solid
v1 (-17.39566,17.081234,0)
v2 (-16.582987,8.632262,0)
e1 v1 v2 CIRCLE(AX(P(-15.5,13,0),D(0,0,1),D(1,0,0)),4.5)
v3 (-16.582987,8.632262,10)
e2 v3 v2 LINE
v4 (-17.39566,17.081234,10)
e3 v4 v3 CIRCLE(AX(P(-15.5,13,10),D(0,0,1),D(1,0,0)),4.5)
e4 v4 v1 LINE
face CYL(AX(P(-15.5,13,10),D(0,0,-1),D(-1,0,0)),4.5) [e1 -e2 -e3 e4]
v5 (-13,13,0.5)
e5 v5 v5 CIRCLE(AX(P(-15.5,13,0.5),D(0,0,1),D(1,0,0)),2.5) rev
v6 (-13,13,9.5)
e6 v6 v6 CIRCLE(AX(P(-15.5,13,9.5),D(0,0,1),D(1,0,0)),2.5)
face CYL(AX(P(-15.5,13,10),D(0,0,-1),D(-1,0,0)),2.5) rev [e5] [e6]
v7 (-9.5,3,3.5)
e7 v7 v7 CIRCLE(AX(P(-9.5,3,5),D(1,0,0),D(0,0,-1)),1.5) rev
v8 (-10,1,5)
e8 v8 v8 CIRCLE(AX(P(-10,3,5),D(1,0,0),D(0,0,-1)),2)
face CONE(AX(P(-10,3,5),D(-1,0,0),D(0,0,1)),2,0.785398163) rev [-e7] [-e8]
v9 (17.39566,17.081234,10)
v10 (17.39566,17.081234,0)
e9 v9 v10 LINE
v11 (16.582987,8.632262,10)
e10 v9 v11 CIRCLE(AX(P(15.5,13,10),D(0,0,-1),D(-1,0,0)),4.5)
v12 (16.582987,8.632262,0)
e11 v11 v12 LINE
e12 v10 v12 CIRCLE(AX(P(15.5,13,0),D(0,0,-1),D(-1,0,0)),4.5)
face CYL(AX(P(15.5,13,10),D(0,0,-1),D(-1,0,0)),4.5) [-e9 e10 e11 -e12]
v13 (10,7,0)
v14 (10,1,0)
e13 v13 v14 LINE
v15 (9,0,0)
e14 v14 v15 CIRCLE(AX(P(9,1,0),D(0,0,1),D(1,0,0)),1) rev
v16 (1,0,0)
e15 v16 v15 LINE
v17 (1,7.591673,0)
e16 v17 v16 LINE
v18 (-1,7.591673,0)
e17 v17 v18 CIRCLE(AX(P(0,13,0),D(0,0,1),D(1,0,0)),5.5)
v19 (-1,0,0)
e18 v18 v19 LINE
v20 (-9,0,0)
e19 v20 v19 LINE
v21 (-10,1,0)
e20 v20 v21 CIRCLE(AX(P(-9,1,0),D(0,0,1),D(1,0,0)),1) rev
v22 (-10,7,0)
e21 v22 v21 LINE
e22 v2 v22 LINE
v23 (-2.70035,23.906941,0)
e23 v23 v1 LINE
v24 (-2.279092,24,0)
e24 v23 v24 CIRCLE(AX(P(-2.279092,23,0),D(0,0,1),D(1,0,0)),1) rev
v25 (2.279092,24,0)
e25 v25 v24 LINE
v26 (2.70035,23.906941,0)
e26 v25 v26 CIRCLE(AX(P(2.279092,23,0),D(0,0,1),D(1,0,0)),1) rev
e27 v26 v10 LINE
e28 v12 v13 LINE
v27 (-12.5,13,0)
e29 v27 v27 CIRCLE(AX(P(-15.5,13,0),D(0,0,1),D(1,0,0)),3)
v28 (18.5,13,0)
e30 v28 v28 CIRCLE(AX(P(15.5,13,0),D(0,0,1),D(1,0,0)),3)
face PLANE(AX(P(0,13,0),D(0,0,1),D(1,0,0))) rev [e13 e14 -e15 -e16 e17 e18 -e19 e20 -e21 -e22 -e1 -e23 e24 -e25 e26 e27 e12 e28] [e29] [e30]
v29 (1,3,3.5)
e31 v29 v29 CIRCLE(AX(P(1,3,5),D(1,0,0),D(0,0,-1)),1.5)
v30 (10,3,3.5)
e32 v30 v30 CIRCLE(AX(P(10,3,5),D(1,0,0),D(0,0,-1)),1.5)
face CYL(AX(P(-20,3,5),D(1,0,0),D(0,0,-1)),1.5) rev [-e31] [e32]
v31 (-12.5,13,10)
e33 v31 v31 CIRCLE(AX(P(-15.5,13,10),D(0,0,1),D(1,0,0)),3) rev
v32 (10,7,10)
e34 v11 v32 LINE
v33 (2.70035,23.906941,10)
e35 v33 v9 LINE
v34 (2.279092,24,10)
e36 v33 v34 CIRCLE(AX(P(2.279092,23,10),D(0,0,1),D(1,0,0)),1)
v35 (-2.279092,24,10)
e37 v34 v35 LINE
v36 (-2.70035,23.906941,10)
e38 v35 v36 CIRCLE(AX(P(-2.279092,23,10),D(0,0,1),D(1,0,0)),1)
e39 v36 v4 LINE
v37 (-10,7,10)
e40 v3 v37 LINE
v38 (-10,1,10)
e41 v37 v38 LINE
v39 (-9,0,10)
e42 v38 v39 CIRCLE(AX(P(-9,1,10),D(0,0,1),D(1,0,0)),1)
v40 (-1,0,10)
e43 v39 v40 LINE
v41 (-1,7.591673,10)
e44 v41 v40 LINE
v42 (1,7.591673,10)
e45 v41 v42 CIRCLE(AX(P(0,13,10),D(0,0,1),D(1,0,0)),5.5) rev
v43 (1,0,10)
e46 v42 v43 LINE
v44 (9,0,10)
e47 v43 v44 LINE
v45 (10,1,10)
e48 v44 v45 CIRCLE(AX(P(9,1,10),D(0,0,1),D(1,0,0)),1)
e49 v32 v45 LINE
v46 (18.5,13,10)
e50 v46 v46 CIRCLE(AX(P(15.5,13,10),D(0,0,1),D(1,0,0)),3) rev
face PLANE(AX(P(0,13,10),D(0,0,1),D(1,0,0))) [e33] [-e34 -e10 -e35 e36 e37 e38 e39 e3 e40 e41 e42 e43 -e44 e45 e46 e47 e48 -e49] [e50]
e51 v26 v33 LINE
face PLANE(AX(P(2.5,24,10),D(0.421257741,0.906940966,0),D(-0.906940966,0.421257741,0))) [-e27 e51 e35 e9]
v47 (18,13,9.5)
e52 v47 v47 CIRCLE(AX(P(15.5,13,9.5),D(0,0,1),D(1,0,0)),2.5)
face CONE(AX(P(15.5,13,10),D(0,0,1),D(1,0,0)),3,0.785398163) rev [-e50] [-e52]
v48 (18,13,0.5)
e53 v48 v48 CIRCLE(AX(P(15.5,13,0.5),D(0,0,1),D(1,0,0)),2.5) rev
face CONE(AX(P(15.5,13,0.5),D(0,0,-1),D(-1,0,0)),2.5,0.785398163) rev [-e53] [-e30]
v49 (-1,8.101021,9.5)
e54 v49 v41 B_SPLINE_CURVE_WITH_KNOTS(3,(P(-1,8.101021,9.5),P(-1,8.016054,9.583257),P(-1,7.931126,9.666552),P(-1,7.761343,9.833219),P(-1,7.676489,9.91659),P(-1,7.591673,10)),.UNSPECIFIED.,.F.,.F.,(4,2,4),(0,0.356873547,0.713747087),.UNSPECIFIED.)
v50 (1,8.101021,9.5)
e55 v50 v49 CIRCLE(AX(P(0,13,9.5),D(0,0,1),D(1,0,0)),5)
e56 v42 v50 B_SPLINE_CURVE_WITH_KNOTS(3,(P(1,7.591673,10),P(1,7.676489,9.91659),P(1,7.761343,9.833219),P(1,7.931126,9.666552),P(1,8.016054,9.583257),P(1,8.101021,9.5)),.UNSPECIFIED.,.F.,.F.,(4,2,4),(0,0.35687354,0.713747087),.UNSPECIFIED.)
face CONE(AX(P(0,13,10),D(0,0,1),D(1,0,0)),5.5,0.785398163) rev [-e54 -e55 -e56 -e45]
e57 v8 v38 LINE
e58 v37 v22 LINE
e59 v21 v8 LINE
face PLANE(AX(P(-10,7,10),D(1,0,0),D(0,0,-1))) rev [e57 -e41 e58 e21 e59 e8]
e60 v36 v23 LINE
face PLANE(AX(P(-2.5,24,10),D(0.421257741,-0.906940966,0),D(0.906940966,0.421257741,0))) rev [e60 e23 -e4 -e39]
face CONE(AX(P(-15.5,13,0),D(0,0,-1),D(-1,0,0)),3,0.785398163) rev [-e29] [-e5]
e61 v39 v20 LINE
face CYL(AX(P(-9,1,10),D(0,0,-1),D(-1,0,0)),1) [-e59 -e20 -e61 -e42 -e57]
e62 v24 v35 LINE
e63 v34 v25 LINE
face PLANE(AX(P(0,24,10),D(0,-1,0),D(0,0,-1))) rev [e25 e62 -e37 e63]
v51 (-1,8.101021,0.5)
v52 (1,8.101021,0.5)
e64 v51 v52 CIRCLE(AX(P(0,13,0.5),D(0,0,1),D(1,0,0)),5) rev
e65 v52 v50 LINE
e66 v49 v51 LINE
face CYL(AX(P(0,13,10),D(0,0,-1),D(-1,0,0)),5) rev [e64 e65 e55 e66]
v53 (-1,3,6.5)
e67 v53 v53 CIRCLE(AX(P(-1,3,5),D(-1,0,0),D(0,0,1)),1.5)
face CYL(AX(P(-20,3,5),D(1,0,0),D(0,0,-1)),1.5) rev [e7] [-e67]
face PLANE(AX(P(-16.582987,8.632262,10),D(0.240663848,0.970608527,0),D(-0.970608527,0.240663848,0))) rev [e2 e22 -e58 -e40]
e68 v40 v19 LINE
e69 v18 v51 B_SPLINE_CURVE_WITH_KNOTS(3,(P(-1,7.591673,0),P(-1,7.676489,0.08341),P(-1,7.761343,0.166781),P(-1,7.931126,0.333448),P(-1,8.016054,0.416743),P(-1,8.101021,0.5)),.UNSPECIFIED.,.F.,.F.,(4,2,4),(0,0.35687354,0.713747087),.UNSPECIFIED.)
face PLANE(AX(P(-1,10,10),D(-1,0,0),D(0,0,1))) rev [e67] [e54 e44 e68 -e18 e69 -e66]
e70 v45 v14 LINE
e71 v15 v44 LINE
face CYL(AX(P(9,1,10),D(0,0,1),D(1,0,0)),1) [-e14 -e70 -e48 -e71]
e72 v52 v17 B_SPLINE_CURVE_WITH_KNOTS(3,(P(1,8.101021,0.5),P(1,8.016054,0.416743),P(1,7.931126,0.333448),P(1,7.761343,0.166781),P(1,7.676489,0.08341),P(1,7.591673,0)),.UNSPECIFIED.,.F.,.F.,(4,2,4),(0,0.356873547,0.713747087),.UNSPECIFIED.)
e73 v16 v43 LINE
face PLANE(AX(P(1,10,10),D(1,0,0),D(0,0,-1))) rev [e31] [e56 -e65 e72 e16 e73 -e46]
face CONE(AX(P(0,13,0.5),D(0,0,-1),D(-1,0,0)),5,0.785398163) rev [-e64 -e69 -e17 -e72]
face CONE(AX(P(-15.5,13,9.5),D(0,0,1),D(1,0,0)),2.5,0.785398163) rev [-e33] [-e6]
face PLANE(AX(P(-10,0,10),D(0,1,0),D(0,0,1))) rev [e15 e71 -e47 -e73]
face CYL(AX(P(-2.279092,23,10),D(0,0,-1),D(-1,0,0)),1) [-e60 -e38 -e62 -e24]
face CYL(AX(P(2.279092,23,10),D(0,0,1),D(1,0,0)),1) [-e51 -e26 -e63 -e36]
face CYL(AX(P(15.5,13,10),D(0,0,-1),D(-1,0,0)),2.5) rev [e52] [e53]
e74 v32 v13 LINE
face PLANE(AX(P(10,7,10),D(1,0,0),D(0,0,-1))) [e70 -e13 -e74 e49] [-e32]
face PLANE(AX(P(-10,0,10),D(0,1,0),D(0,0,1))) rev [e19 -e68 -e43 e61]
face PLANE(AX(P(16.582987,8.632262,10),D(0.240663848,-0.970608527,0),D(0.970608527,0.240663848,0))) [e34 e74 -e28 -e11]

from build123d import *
from build123d.topology import SkipClean

# Parameters (mm, degrees)
SKETCH_1_R          = 2.5
EXTRUDE_1_DEPTH     = 10
SKETCH_2_W          = 2
SKETCH_2_H          = 10
CUT_EXTRUDE_1_DEPTH = 10
SKETCH_3_R          = 1.5
CUT_EXTRUDE_2_DEPTH = 40.698866483
CHAMFER_1_SIZE      = 0.5
FILLET_1_R          = 1


with BuildPart() as part:
    # 草图1 → 凸台-拉伸1 (new body)
    with BuildSketch(Plane.XY):
        with BuildLine():
            Line((0, 0), (0, 8))
            ThreePointArc((0, 8), (-5, 13), (0, 18))
            Line((0, 18), (0, 24))
            Line((0, 24), (-2.5, 24))
            Line((-2.5, 24), (-17.395659833, 17.081234348))
            ThreePointArc((-17.395659833, 17.081234348), (-19.979326925, 12.569151657), (-16.582987314, 8.632261629))
            Line((-16.582987314, 8.632261629), (-10, 7))
            Line((-10, 7), (-10, 0))
            Line((-10, 0), (0, 0))
        make_face()
        with Locations((-15.5, 13)):
            Circle(SKETCH_1_R, mode=Mode.SUBTRACT)
    extrude_1 = extrude(amount=EXTRUDE_1_DEPTH)

    # 镜向1: 凸台-拉伸1 across plane
    with SkipClean():  # the faces are left unmerged after this step: merging them gives an invalid solid
        add(extrude_1.mirror(Plane(origin=(0, 18, 10), x_dir=(0, 0, 1), z_dir=(-1, 0, 0))))

    # 草图2 → 切除-拉伸1 (cut)
    with BuildSketch(Plane.XZ):
        with Locations((0, 5)):
            Rectangle(SKETCH_2_W, SKETCH_2_H)
    extrude(amount=-CUT_EXTRUDE_1_DEPTH, mode=Mode.SUBTRACT)

    # 草图3 → 切除-拉伸2 (cut, through all)
    with BuildSketch(Plane(origin=(10, 0, 0), x_dir=(0, 0, -1), z_dir=(1, 0, 0))):
        with Locations((-5, 3)):
            Circle(SKETCH_3_R)
    extrude(amount=-CUT_EXTRUDE_2_DEPTH, mode=Mode.SUBTRACT)

    # 倒角1
    chamfer_1_edges = [part.edges().sort_by_distance(p)[0] for p in [
        (-18, 13, 0),
        (-18, 13, 10),
        (18, 13, 10),
        (18, 13, 0),
        (0, 18, 0),
        (0, 18, 10),
        (-10, 3, 6.5),
    ]]
    chamfer(chamfer_1_edges, length=CHAMFER_1_SIZE)

    # 圆角1
    fillet_1_edges = [part.edges().sort_by_distance(p)[0] for p in [
        (-10, 0, 5),
        (-2.5, 24, 5),
        (10, 0, 5),
        (2.5, 24, 5),
    ]]
    fillet(fillet_1_edges, radius=FILLET_1_R - 0.0001)  # a hair under: the kernel refuses the full size


solid = part.part
